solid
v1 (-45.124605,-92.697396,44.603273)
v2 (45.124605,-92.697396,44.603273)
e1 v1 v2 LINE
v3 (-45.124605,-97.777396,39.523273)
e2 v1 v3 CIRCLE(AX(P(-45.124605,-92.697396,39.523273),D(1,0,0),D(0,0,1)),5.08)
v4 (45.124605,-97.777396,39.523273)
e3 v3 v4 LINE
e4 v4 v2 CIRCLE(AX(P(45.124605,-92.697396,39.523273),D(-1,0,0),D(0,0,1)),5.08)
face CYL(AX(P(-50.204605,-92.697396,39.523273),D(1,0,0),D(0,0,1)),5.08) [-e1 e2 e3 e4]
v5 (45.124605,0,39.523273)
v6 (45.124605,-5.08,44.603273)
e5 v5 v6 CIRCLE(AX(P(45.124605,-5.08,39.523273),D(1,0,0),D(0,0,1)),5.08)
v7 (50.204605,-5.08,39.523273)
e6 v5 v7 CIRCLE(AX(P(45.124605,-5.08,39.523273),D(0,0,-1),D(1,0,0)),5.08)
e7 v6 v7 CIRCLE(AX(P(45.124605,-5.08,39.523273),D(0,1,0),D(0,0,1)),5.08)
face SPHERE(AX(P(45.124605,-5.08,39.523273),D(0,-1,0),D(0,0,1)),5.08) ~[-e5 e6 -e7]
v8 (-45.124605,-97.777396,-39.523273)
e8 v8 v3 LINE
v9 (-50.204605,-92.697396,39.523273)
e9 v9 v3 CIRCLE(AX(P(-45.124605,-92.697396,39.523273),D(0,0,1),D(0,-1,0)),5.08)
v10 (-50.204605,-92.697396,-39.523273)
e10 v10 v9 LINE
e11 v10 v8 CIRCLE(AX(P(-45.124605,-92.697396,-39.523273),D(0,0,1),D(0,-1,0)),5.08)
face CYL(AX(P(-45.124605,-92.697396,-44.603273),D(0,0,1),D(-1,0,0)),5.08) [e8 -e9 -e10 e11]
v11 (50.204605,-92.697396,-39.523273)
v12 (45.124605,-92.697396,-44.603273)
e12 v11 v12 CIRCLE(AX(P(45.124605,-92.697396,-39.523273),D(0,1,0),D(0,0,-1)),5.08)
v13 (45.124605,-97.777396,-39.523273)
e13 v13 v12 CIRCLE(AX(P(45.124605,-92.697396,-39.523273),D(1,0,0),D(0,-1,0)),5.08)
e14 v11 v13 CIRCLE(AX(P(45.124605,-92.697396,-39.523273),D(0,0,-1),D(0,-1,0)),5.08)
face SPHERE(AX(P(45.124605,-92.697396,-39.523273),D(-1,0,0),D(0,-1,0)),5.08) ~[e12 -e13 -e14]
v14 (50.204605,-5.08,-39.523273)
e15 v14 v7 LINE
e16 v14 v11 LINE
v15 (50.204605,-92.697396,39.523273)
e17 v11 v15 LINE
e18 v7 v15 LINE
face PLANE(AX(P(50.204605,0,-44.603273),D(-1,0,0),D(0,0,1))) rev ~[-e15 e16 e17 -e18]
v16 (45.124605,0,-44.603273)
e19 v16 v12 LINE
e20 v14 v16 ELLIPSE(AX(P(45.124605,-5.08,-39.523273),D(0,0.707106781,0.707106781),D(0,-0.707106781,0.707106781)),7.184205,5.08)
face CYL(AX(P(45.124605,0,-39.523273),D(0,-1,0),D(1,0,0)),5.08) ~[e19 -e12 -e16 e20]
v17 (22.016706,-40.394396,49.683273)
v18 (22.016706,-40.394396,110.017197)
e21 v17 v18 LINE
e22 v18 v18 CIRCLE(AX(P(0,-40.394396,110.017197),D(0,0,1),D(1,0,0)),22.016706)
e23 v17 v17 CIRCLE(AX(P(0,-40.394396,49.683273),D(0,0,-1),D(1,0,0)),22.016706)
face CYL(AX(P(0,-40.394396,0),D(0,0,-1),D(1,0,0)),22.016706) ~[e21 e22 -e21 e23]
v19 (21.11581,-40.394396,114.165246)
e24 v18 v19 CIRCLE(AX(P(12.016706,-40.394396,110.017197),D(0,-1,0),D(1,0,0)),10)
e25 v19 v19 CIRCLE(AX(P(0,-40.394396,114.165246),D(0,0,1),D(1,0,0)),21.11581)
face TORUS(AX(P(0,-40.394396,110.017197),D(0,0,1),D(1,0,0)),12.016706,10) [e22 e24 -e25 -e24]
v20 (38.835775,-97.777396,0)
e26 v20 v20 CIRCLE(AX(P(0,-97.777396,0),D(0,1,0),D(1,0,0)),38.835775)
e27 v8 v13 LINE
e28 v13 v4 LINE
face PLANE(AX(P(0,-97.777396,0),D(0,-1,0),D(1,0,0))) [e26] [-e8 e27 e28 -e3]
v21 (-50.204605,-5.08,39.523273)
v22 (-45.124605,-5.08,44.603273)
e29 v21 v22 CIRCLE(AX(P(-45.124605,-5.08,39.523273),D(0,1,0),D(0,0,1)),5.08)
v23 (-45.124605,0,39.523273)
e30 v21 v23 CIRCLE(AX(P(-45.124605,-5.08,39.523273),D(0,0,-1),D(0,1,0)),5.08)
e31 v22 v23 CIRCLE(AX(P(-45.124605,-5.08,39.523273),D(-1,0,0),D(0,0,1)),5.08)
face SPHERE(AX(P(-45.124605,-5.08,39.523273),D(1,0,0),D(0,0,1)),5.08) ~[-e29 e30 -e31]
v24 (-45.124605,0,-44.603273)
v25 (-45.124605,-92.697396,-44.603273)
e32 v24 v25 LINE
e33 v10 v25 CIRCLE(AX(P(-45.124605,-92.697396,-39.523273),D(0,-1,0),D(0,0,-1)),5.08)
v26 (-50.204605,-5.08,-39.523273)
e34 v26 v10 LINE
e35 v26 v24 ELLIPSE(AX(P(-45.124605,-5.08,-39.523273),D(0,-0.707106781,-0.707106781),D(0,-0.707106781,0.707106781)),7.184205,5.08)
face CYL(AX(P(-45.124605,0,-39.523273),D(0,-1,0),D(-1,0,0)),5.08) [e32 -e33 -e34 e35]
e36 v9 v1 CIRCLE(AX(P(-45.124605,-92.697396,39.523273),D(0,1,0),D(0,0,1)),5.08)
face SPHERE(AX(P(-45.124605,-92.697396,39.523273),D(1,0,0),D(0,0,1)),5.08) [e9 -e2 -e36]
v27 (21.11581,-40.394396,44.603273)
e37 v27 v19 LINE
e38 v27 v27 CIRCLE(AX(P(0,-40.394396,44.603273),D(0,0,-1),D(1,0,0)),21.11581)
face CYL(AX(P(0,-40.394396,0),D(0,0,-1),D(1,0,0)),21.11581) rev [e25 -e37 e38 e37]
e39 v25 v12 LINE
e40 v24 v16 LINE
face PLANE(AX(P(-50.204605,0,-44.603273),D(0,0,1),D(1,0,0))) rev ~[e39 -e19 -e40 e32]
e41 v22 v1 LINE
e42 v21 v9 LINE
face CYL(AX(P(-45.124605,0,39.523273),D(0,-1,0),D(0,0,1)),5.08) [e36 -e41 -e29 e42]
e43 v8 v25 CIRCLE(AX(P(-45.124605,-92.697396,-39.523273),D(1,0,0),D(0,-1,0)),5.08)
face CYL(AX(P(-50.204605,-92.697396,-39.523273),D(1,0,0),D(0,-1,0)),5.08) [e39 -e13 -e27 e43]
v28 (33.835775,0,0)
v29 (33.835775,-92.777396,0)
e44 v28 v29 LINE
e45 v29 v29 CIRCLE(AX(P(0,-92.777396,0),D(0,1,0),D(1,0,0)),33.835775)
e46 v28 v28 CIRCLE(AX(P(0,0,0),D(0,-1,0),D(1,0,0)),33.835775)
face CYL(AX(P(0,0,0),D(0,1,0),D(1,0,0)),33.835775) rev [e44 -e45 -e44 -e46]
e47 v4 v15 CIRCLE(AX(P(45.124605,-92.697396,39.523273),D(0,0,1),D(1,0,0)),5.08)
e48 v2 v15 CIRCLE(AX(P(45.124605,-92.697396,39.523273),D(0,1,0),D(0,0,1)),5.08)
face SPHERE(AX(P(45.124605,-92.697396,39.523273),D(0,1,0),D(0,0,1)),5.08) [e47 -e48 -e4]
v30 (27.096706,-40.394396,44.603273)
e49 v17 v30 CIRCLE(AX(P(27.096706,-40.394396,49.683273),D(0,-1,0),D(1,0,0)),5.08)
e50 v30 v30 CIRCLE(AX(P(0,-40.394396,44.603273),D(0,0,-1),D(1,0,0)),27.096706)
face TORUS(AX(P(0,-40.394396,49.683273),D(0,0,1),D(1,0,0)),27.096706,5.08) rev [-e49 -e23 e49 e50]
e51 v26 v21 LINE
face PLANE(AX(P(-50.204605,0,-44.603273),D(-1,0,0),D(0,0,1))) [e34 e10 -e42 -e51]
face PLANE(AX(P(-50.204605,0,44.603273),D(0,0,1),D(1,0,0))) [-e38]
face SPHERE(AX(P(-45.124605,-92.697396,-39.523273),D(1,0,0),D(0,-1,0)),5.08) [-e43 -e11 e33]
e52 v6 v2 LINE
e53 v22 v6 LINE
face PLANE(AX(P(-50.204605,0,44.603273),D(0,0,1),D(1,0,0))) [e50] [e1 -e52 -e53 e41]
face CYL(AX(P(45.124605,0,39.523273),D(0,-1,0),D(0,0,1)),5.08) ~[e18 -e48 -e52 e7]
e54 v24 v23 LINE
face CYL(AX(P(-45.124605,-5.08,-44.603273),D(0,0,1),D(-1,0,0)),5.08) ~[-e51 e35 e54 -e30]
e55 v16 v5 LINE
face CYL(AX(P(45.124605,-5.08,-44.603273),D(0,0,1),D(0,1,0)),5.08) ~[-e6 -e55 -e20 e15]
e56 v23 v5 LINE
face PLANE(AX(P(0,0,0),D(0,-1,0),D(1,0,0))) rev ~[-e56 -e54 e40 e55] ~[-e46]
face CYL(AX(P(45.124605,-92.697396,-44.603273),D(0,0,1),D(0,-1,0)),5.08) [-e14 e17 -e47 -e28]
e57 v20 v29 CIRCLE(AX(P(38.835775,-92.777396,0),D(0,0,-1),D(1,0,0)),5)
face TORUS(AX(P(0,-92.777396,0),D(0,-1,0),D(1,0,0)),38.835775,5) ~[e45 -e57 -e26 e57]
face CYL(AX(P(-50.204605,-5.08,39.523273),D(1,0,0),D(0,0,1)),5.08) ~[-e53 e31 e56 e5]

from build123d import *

# Parameters (mm, degrees)
F0_W     = 100.4092097282
F0_H     = 89.206546545
F1_DEPTH = 97.7773964405
F2_R     = 22.0167060196
F2_R_2   = 21.115809679
F3_DEPTH = 114.1652464867
F4_R     = 5.08
F5_R     = 33.8357748328
F6_DEPTH = 98.3386710286
F7_R     = 5


# Not quite as in the source:
# - a fillet or chamfer that OpenCascade refuses, or shapes differently, is made with other operations: its cross-section is extruded or revolved along the edge and cut away or added
# - the program builds the solid bodies; features that only make, move or delete a surface that nothing else refers to are left out


with BuildPart() as f1:
    # F0 (on Front) → F1 (new body)
    with BuildSketch(Plane.XZ):
        Rectangle(F0_W, F0_H)
    extrude(amount=F1_DEPTH)

    # F2 (on Top) → F3 (join)
    with BuildSketch(Plane.XY):
        with Locations((0, -40.3943955898)):
            Circle(F2_R)
        with Locations((0, -40.3943955898)):
            Circle(F2_R_2, mode=Mode.SUBTRACT)
    extrude(amount=F3_DEPTH)

    # F4
    f4_edges = [f1.edges().sort_by_distance(p)[0] for p in [
        (50.204605, -48.888698, 44.603273),
        (0, 0, 44.603273),
        (0, -97.777396, 44.603273),
        (-50.204605, -48.888698, 44.603273),
        (-22.016706, -40.394396, 44.603273),
        (0, -97.777396, -44.603273),
        (50.204605, -97.777396, 0),
        (-50.204605, -97.777396, 0),
        (-50.204605, -48.888698, -44.603273),
        (-50.204605, 0, 0),
        (50.204605, -48.888698, -44.603273),
        (50.204605, 0, 0),
    ]]
    fillet(f4_edges, radius=F4_R)

    # F5 (on Front) → F6 (cut)
    with BuildSketch(Plane.XZ):
        Circle(F5_R)
    extrude(amount=F6_DEPTH, mode=Mode.SUBTRACT)

    # F7
    f7_edges = [f1.edges().sort_by_distance(p)[0] for p in [
        (50.204605, -48.888698, 39.523273),
        (50.204605, -5.08, 0),
        (50.204605, -92.697396, 0),
        (50.204605, -48.888698, -39.523273),
        (-33.835775, -97.777396, 0),
    ]]
    fillet(f7_edges, radius=F7_R)

    # F10: fillet of radius 10 on 1 edges, made by hand

    # F10_s1 → F10_t2 (revolve, cut)
    with BuildSketch(Plane.XZ.offset(40.3943955898)):
        with BuildLine():
            ThreePointArc((22.0167060196, 110.017197235), (21.7888868559, 112.1395736631), (21.115809679, 114.1652464867))
            Line((21.115809679, 114.1652464867), (22.0167060196, 114.1652464867))
            Line((22.0167060196, 114.1652464867), (22.0167060196, 110.017197235))
        make_face()
    revolve(axis=Axis((0, -40.3943955898, 114.1652464867), (0, 0, 1)), mode=Mode.SUBTRACT)


solid = f1.part
